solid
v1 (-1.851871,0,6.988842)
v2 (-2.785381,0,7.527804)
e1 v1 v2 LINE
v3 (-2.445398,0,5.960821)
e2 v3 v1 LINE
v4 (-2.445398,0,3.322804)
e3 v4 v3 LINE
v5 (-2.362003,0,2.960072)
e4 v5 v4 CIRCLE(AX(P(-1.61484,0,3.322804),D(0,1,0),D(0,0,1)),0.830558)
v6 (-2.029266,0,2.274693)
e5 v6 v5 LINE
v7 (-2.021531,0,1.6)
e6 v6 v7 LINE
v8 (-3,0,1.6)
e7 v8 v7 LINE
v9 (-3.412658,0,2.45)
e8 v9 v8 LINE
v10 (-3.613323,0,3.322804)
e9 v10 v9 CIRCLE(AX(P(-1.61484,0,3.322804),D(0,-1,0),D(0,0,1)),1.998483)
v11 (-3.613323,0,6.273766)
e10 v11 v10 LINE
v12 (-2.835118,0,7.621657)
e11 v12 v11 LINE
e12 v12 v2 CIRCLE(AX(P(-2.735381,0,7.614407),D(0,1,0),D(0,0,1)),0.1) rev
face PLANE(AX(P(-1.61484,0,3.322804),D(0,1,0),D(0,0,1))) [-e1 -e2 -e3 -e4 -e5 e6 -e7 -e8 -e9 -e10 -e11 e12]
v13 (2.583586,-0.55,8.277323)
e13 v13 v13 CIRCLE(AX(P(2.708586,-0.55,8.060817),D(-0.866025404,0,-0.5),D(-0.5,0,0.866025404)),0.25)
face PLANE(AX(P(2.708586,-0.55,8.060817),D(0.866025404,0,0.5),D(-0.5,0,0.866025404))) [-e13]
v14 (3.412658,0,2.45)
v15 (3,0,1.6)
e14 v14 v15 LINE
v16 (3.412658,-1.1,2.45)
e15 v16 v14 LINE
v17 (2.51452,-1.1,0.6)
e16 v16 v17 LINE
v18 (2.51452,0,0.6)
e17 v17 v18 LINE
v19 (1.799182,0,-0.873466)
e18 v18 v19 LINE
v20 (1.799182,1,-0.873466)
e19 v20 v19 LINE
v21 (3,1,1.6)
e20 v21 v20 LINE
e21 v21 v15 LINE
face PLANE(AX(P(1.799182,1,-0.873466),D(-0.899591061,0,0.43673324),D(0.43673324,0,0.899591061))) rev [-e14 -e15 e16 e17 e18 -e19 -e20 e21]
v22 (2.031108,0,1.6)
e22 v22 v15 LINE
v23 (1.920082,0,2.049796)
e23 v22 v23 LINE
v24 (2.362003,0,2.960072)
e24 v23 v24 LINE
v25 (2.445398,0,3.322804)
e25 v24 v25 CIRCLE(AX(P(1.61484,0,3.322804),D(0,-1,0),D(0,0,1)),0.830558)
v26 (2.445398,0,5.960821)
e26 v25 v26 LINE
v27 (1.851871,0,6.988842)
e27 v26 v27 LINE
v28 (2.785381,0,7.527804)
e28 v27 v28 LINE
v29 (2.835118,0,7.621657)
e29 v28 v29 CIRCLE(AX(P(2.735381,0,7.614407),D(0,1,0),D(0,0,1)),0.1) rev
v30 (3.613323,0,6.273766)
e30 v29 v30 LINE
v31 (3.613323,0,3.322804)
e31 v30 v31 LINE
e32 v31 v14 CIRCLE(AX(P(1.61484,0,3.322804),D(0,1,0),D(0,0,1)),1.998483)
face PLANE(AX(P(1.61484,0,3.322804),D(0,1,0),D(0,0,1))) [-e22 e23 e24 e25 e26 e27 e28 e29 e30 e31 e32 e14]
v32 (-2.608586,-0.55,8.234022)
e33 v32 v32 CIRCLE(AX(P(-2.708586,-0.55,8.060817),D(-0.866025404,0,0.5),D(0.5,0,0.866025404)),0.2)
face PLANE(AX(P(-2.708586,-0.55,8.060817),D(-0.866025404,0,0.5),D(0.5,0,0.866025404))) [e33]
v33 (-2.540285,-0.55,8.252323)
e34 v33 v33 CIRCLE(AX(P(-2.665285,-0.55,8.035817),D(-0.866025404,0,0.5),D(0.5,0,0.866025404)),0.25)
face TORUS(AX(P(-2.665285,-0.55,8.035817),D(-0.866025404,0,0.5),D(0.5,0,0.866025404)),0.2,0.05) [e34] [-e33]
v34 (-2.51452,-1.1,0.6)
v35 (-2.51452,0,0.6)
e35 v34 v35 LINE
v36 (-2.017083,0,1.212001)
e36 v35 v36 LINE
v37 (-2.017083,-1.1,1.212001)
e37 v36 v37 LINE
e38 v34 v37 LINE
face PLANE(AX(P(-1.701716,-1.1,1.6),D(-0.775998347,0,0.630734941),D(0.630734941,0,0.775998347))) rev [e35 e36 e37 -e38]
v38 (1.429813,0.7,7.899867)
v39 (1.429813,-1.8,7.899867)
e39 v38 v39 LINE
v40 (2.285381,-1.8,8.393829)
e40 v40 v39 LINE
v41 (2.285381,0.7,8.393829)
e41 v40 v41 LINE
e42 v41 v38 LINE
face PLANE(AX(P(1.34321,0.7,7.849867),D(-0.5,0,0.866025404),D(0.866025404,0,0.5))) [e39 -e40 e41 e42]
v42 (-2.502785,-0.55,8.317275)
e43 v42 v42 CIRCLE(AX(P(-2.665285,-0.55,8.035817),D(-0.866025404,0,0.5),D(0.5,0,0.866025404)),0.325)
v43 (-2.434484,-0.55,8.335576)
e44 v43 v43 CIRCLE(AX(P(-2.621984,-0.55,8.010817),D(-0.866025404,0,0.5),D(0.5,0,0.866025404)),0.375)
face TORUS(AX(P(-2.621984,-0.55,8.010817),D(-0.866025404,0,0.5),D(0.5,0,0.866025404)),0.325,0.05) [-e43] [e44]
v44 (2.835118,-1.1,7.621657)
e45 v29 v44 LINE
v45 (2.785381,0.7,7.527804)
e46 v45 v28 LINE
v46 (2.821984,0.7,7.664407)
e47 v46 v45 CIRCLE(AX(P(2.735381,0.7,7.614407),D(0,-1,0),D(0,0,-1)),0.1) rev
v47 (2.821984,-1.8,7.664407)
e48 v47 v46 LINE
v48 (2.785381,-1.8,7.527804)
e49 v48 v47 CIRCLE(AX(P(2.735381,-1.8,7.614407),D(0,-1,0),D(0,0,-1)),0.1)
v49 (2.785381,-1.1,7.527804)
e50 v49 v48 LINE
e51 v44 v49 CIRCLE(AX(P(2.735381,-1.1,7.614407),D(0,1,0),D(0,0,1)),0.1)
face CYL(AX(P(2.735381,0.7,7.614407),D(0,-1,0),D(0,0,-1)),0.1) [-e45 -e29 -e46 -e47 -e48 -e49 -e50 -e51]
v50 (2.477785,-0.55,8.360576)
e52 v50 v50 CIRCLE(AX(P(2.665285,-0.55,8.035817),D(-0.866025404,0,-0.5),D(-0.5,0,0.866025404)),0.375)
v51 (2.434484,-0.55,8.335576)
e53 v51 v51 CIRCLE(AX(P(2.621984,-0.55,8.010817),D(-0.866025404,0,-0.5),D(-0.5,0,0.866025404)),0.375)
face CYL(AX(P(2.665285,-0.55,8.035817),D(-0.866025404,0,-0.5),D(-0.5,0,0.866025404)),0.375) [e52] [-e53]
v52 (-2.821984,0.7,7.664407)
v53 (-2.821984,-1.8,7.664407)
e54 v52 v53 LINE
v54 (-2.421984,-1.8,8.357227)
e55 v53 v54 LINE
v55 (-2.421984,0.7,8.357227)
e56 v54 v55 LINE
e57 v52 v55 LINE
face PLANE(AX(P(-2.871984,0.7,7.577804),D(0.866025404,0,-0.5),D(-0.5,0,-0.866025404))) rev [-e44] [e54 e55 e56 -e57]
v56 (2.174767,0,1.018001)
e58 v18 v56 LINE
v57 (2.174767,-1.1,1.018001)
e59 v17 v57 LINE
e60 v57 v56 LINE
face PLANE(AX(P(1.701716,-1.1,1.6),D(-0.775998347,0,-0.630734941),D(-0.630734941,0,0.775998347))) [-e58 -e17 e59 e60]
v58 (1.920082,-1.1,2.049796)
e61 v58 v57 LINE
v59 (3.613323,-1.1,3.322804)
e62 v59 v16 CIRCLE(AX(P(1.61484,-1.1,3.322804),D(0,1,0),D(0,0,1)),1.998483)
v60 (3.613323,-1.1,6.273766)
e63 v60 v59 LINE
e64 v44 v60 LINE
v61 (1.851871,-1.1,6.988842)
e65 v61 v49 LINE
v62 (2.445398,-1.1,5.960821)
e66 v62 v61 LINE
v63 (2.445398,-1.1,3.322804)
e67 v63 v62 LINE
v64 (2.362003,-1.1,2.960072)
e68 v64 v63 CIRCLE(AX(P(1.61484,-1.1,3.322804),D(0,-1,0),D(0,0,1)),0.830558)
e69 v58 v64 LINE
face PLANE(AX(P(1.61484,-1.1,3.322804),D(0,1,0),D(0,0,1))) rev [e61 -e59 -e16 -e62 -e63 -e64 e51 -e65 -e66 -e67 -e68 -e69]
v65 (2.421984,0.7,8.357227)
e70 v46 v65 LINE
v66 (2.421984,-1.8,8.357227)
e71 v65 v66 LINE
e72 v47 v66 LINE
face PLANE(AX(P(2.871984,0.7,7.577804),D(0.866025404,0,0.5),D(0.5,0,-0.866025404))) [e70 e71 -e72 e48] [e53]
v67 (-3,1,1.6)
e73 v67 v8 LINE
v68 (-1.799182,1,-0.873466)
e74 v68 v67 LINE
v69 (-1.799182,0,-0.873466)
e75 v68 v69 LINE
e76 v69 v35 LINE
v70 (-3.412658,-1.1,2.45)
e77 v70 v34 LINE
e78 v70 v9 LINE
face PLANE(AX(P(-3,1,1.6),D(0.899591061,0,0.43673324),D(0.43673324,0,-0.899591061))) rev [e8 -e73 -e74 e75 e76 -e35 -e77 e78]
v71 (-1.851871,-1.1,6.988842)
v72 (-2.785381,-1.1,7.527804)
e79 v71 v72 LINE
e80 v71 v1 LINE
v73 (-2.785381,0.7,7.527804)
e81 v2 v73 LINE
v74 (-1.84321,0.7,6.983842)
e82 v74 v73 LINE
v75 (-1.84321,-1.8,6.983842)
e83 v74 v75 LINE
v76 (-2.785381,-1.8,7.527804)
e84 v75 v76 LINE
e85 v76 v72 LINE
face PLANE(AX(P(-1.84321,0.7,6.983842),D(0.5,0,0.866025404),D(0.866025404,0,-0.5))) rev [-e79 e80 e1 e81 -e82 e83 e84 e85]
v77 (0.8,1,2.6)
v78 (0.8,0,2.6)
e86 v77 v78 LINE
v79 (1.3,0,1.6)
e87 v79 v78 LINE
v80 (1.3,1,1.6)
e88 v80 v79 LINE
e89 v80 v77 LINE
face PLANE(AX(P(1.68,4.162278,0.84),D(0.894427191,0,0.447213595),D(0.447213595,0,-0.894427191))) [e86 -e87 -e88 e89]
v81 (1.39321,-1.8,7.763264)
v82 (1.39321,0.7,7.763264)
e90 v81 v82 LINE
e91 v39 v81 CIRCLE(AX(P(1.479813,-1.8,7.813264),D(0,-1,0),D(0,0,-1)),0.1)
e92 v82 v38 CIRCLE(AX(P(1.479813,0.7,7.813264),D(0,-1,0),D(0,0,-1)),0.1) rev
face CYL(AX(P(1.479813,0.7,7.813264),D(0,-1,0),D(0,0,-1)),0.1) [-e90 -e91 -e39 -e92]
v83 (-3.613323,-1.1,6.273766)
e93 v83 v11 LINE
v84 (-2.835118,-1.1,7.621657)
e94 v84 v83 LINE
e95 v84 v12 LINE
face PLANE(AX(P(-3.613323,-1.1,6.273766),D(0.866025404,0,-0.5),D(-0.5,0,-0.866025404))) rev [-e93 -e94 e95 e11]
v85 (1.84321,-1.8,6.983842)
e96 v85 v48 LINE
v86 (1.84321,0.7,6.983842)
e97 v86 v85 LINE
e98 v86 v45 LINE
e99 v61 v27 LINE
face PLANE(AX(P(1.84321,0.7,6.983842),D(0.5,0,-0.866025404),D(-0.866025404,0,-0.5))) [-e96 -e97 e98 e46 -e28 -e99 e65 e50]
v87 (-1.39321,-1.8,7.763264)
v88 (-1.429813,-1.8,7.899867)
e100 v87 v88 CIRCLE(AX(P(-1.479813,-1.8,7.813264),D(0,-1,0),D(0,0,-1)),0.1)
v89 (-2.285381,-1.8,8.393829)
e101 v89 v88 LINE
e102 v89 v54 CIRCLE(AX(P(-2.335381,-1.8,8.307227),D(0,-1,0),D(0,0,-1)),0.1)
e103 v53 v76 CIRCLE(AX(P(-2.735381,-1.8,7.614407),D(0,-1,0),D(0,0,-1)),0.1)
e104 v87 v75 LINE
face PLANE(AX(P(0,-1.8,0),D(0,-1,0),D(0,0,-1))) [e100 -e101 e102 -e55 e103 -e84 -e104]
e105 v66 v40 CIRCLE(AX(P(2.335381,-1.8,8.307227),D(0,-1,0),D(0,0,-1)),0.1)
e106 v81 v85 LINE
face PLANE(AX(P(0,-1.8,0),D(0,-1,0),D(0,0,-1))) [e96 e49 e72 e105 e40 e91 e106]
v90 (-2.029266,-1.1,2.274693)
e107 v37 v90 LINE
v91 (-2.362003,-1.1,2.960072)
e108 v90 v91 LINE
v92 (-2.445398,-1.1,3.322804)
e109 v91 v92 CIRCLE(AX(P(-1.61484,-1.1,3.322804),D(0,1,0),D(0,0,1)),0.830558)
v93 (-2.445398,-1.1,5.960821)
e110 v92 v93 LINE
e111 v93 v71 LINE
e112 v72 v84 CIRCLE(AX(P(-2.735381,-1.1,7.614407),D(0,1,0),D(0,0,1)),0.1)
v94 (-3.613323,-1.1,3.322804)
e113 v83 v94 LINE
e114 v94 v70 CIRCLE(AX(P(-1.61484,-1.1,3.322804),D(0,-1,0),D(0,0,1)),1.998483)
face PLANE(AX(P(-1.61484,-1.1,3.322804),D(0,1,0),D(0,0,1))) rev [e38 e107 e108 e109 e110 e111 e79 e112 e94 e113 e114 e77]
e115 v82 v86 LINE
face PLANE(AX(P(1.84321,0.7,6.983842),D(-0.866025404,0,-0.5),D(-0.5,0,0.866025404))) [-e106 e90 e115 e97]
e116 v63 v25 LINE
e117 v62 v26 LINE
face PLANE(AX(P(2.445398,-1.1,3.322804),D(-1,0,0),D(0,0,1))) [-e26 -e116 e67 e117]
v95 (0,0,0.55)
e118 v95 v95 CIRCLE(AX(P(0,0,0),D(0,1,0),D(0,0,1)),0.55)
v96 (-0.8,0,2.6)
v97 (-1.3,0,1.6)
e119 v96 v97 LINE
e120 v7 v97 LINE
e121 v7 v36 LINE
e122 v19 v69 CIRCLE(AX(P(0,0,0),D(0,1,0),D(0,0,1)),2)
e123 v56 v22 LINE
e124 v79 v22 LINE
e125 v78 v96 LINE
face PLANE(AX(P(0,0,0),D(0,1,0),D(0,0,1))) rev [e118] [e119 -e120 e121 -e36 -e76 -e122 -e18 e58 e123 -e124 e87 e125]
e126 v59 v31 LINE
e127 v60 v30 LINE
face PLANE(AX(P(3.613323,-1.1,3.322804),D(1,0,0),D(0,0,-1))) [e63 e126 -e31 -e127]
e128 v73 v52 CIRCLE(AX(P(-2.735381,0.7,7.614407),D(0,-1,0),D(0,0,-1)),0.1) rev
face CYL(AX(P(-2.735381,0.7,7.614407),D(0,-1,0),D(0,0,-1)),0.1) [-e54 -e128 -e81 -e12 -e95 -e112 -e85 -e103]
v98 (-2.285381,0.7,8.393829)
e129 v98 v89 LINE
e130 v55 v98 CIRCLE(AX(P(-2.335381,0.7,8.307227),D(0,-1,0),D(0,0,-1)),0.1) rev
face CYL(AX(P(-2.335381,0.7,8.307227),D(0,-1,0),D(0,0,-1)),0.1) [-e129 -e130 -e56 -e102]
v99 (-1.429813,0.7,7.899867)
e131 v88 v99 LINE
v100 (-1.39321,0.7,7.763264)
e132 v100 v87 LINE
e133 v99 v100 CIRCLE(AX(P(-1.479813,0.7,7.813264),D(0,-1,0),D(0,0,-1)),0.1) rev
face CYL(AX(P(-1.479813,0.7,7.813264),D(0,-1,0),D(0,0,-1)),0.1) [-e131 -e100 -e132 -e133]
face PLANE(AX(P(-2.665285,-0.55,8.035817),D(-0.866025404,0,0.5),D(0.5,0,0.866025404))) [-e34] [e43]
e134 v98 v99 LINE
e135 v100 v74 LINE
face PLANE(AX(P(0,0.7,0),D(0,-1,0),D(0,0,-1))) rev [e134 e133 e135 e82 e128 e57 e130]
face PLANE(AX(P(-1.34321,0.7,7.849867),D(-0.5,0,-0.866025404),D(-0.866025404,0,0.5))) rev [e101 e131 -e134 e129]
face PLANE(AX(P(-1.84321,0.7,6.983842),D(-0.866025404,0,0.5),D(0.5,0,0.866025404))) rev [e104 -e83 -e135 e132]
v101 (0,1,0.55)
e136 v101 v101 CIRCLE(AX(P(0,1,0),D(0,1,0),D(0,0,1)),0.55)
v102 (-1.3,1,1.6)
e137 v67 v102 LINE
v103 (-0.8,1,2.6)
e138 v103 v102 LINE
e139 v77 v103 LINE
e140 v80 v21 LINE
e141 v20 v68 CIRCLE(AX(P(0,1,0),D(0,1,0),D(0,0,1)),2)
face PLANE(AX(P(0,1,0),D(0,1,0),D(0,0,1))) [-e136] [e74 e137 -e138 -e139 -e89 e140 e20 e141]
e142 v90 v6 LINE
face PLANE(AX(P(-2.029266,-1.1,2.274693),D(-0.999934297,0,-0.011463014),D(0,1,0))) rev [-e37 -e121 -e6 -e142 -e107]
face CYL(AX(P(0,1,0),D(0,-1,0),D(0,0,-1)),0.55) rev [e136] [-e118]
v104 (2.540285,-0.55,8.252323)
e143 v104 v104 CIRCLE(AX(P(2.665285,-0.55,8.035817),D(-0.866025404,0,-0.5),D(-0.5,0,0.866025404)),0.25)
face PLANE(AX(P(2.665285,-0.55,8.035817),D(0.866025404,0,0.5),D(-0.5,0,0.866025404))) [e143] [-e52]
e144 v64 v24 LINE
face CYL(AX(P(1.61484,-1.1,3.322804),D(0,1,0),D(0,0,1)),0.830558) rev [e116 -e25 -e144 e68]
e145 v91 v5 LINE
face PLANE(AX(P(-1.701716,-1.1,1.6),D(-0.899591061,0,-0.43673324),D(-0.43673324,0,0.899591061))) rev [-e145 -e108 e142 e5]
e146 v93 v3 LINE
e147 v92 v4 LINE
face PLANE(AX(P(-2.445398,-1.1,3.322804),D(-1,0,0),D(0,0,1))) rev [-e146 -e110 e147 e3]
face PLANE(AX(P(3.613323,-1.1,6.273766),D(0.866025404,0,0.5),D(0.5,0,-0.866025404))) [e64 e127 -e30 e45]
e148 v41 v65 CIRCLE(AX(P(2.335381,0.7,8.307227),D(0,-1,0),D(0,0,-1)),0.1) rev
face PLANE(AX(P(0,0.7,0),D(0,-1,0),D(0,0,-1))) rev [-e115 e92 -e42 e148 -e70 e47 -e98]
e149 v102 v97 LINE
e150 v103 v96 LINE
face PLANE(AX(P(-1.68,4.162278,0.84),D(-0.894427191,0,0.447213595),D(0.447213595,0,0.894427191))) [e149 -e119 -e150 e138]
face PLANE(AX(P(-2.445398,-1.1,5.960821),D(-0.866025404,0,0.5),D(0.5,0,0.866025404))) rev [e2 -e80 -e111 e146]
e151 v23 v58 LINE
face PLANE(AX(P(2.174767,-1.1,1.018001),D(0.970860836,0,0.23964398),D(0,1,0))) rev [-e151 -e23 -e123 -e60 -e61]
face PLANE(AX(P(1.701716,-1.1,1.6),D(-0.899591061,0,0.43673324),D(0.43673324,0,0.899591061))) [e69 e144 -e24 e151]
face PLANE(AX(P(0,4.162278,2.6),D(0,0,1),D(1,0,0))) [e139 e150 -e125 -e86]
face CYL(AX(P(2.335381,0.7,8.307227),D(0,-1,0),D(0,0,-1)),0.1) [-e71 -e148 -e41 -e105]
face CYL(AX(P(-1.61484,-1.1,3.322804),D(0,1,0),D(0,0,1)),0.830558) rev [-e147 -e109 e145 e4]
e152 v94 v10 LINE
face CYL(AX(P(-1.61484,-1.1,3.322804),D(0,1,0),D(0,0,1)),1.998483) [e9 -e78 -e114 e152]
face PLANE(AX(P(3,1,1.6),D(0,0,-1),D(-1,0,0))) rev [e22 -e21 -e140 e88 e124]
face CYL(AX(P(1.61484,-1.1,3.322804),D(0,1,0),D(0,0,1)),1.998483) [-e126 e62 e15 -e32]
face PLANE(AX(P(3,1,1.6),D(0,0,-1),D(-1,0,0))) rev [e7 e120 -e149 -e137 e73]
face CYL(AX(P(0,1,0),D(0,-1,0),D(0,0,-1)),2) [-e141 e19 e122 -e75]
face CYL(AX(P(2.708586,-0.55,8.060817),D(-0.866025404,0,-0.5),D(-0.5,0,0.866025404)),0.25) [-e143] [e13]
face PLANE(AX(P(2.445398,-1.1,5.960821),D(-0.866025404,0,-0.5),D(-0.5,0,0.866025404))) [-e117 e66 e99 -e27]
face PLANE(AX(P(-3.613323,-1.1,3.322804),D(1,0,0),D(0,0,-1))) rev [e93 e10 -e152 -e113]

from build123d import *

# Parameters (mm, degrees)
SKETCH1_R           = 0.55
BOSS_EXTRUDE1_DEPTH = 1
BOSS_EXTRUDE3_DEPTH = 1.1
BOSS_EXTRUDE4_DEPTH = 1.25
SKETCH5_R           = 0.375
BOSS_EXTRUDE5_DEPTH = 0.05
SKETCH6_R           = 0.25
BOSS_EXTRUDE6_DEPTH = 0.05
CHAMFER1_SIZE       = 0.75
CHAMFER1_SIZE_2     = 0.5
MIRROR1_START       = -1.1
MIRROR1_DEPTH       = 1.1
MIRROR1_START_2     = -1.8
MIRROR1_2_DEPTH     = 2.5
MIRROR1_START_3     = 6.27611275
MIRROR1_3_OUTLINE_R = 0.375
MIRROR1_3_DEPTH     = 0.05
MIRROR1_START_4     = 6.32611275
MIRROR1_4_OUTLINE_R = 0.25
MIRROR1_4_DEPTH     = 0.05
FILLET2_R           = 0.05
BOSS_EXTRUDE7_DEPTH = 1
FILLET3_R           = 0.1


with BuildPart() as part:
    # Sketch1 → Boss-Extrude1 (new body)
    with BuildSketch(Plane(origin=(0, 0, 0), x_dir=(1, 0, 0), z_dir=(0, 1, 0))):
        with BuildLine():
            Line((-3, -1.6), (-1.799182122, 0.873466479))
            ThreePointArc((-1.799182122, 0.873466479), (0, 2), (1.799182122, 0.873466479))
            Line((1.799182122, 0.873466479), (3, -1.6))
            Line((3, -1.6), (-3, -1.6))
        make_face()
        with Locations(Location((0, 0, 0), (0, 0, 270))):
            Circle(SKETCH1_R, mode=Mode.SUBTRACT)
    extrude(amount=BOSS_EXTRUDE1_DEPTH)

    # Sketch3 → Boss-Extrude3 (add)
    with BuildSketch(Plane(origin=(0, 0, 0), x_dir=(-1, 0, 0), z_dir=(0, -1, 0))):
        with BuildLine():
            Line((2.514520254, -0.6), (3.412657784, -2.45))
            ThreePointArc((3.412657784, -2.45), (3.562510993, -2.875016795), (3.613323348, -3.322803983))
            Line((3.613323348, -3.322803983), (3.613323348, -6.273765877))
            Line((3.613323348, -6.273765877), (2.863323348, -7.572803983))
            Line((2.863323348, -7.572803983), (1.851870719, -6.988841535))
            Line((1.851870719, -6.988841535), (2.445398453, -5.960821345))
            Line((2.445398453, -5.960821345), (2.445398453, -3.322803983))
            ThreePointArc((2.445398453, -3.322803983), (2.424281128, -3.13670618), (2.362002989, -2.960071623))
            Line((2.362002989, -2.960071623), (1.701715763, -1.6))
            Line((1.701715763, -1.6), (2.514520254, -0.6))
        make_face()
    extrude(amount=BOSS_EXTRUDE3_DEPTH)

    # Sketch4 → Boss-Extrude4 (add, symmetric)
    with BuildSketch(Plane(origin=(2.003180044, -0.55, 0.513767997), x_dir=(1, 0, 0), z_dir=(0, 1, 0))):
        Polygon((-3.84639051, -6.470073538), (-4.875163646, -7.064035986), (-4.375163646, -7.930061389), (-3.34639051, -7.336098942), align=None)
    extrude(amount=BOSS_EXTRUDE4_DEPTH, both=True)

    # Sketch5 → Boss-Extrude5 (add)
    with BuildSketch(Plane(origin=(-5.435273078, 0, 3.138056375), x_dir=(0.5000000000000009, 0, 0.8660254037844383), z_dir=(-0.8660254037844382, 0, 0.5000000000000008))):
        with Locations((5.626578953, -0.55)):
            Circle(SKETCH5_R)
    extrude(amount=BOSS_EXTRUDE5_DEPTH)

    # Sketch6 → Boss-Extrude6 (add)
    with BuildSketch(Plane(origin=(-5.478574348, 0, 3.163056375), x_dir=(0.5000000000000008, 0, 0.8660254037844383), z_dir=(-0.8660254037844382, 0, 0.5000000000000007))):
        with Locations((5.626578953, -0.55)):
            Circle(SKETCH6_R)
    extrude(amount=BOSS_EXTRUDE6_DEPTH)

    # Chamfer1
    # the kernel refuses this chamfer: 0.75, 0.5 mm, written as the material it takes off along each edge
    with BuildSketch(Plane(origin=(-1.701715763, 0, 1.6), x_dir=(-0.43673323969900685, 0, 0.899591061172803), z_dir=(0, -1, 0))) as chamfer1_piece_1:
        Polygon((CHAMFER1_SIZE, 0), (-CHAMFER1_SIZE_2 * 0.422618261741, CHAMFER1_SIZE_2 * 0.906307787037), (0, 0), align=None)
    extrude(amount=3.043103543, mode=Mode.SUBTRACT)

    # Mirror1: read off the stored shape, not the designer's step
    # Mirror1 outline → Mirror1 (add)
    with BuildSketch(Plane(origin=(0, 0, 0), x_dir=(1, 0, 0), z_dir=(0, 1, 0)).offset(MIRROR1_START)):
        with BuildLine():
            Line((3.412657784, -2.45), (2.514520254, -0.6))
            Line((2.514520254, -0.6), (2.174766969, -1.01800124))
            Line((2.174766969, -1.01800124), (1.920082383, -2.049795531))
            Line((1.920082383, -2.049795531), (2.362002989, -2.960071623))
            ThreePointArc((2.362002989, -2.960071623), (2.424281128, -3.13670618), (2.445398453, -3.322803983))
            Line((2.445398453, -3.322803983), (2.445398453, -5.960821345))
            Line((2.445398453, -5.960821345), (1.851870719, -6.988841535))
            Line((1.851870719, -6.988841535), (1.843210465, -6.983841535))
            Line((1.843210465, -6.983841535), (1.343210465, -7.849866939))
            Line((1.343210465, -7.849866939), (2.371983602, -8.443829386))
            Line((2.371983602, -8.443829386), (2.871983602, -7.577803983))
            Line((2.871983602, -7.577803983), (2.863323348, -7.572803983))
            Line((2.863323348, -7.572803983), (3.613323348, -6.273765877))
            Line((3.613323348, -6.273765877), (3.613323348, -3.322803983))
            ThreePointArc((3.613323348, -3.322803983), (3.562510993, -2.875016795), (3.412657784, -2.45))
        make_face()
    extrude(amount=MIRROR1_DEPTH)

    # Mirror1 2 outline → Mirror1 2 (add)
    with BuildSketch(Plane(origin=(0, 0, 0), x_dir=(1, 0, 0), z_dir=(0, 1, 0)).offset(MIRROR1_START_2)):
        Polygon((2.871983602, -7.577803983), (1.843210465, -6.983841535), (1.343210465, -7.849866939), (2.371983602, -8.443829386), align=None)
    extrude(amount=MIRROR1_2_DEPTH)

    # Mirror1 3 outline → Mirror1 3 (add)
    with BuildSketch(Plane(origin=(0, 0, 0), x_dir=(0.500000000000001, 0, -0.866025403784438), z_dir=(0.866025403784438, 0, 0.500000000000001)).offset(MIRROR1_START_3)):
        with Locations((-5.626578953, -0.55)):
            Circle(MIRROR1_3_OUTLINE_R)
    extrude(amount=MIRROR1_3_DEPTH)

    # Mirror1 4 outline → Mirror1 4 (add)
    with BuildSketch(Plane(origin=(0, 0, 0), x_dir=(0.500000000000001, 0, -0.866025403784438), z_dir=(0.866025403784438, 0, 0.500000000000001)).offset(MIRROR1_START_4)):
        with Locations((-5.626578953, -0.55)):
            Circle(MIRROR1_4_OUTLINE_R)
    extrude(amount=MIRROR1_4_DEPTH)

    # Fillet2
    fillet2_edges = [part.edges().sort_by_distance(p)[0] for p in [
        (-2.852784872, -0.55, 7.711057158),
        (-2.833586142, -0.55, 7.844310334),
    ]]
    fillet(fillet2_edges, radius=FILLET2_R - 0.0001)  # a hair under: the kernel refuses the full size

    # Sketch7 → Boss-Extrude7 (add)
    with BuildSketch(Plane(origin=(0, 0, 0), x_dir=(1, 0, 0), z_dir=(0, 1, 0))):
        Polygon((-0.8, -2.6), (0.8, -2.6), (1.3, -1.6), (0, -0.8), (-1.3, -1.6), align=None)
    extrude(amount=BOSS_EXTRUDE7_DEPTH)

    # Fillet3
    # the kernel refuses this fillet: 0.1 mm, written as the material it takes off along each edge
    with BuildSketch(Plane(origin=(2.871983602, -1.1, 7.577803983), x_dir=(-0.8660254028383251, 0, -0.5000000016387168), z_dir=(0, 1, 0))) as fillet3_piece_1_section:
        with BuildLine():
            CenterArc((FILLET3_R * 0.9999999985, FILLET3_R), FILLET3_R, 180.000000086, 89.999999914)
            Line((-FILLET3_R * 1.50001067123e-09, FILLET3_R * 0.9999999985), (0, 0))
            Line((0, 0), (FILLET3_R * 0.9999999985, 0))
        make_face()
    fillet3_piece_1 = extrude(amount=1.1, mode=Mode.PRIVATE)
    fillet3_piece_1 = split(fillet3_piece_1, bisect_by=Plane(origin=(2.863323348, -1.1, 7.572803983), z_dir=(0.8660254038383292, 0, 0.49999999990665916)), keep=Keep.TOP, mode=Mode.PRIVATE)
    add(fillet3_piece_1, mode=Mode.SUBTRACT)
    with BuildSketch(Plane(origin=(2.371983602, 0.95, 8.443829386), x_dir=(0.5000000003396727, 0, -0.8660254035883286), z_dir=(0, -1, 0)), Plane(origin=(1.343210465, -2.05, 7.849866939), x_dir=(0.4999999999066601, 0, -0.8660254038383285), z_dir=(0, 1, 0)), Plane(origin=(-2.371983602, -2.05, 8.443829386), x_dir=(-0.5000000000000007, 0, -0.8660254037844383), z_dir=(0, 1, 0))) as fillet3_piece_2:
        with BuildLine():
            CenterArc((FILLET3_R, -FILLET3_R), FILLET3_R, 90, 89.999999953)
            Line((0, -FILLET3_R), (0, 0))
            Line((0, 0), (FILLET3_R, 0))
        make_face()
    extrude(amount=3, mode=Mode.SUBTRACT)
    with BuildSketch(Plane(origin=(-2.871983602, -2.05, 7.577803983), x_dir=(0.5000000000000002, 0, 0.8660254037844386), z_dir=(0, 1, 0))) as fillet3_piece_3_section:
        with BuildLine():
            CenterArc((FILLET3_R, FILLET3_R), FILLET3_R, 180, 90)
            Line((0, FILLET3_R), (0, 0))
            Line((0, 0), (FILLET3_R, 0))
        make_face()
    fillet3_piece_3 = extrude(amount=3, mode=Mode.PRIVATE)
    fillet3_piece_3 = split(fillet3_piece_3, bisect_by=Plane(origin=(-2.871983602, -1.1, 7.577803983), z_dir=(0, -1, 0)), keep=Keep.TOP, mode=Mode.PRIVATE)
    fillet3_piece_3 = split(fillet3_piece_3, bisect_by=Plane(origin=(-2.863323348, -2.05, 7.572803983), z_dir=(-0.8660254037844362, 0, 0.5000000000000044)), keep=Keep.TOP, mode=Mode.PRIVATE)
    add(fillet3_piece_3, mode=Mode.SUBTRACT)
    with BuildSketch(Plane(origin=(-2.871983602, -2.05, 7.577803983), x_dir=(0.5000000000000002, 0, 0.8660254037844386), z_dir=(0, 1, 0))) as fillet3_piece_4_section:
        with BuildLine():
            CenterArc((FILLET3_R, FILLET3_R), FILLET3_R, 180, 90)
            Line((0, FILLET3_R), (0, 0))
            Line((0, 0), (FILLET3_R, 0))
        make_face()
    fillet3_piece_4 = extrude(amount=3, mode=Mode.PRIVATE)
    fillet3_piece_4 = split(fillet3_piece_4, bisect_by=Plane(origin=(-2.871983602, -1.1, 7.577803983), z_dir=(0, -1, 0)), keep=Keep.TOP, mode=Mode.PRIVATE)
    fillet3_piece_4 = split(fillet3_piece_4, bisect_by=Plane(origin=(-2.863323348, -2.05, 7.572803983), z_dir=(0.8660254037844362, 0, -0.5000000000000044)), keep=Keep.TOP, mode=Mode.PRIVATE)
    add(fillet3_piece_4, mode=Mode.SUBTRACT)
    with BuildSketch(Plane(origin=(-2.871983602, -2.05, 7.577803983), x_dir=(0.5000000000000002, 0, 0.8660254037844386), z_dir=(0, 1, 0))) as fillet3_piece_5_section:
        with BuildLine():
            CenterArc((FILLET3_R, FILLET3_R), FILLET3_R, 180, 90)
            Line((0, FILLET3_R), (0, 0))
            Line((0, 0), (FILLET3_R, 0))
        make_face()
    fillet3_piece_5 = extrude(amount=3, mode=Mode.PRIVATE)
    fillet3_piece_5 = split(fillet3_piece_5, bisect_by=Plane(origin=(-2.871983602, 0, 7.577803983), z_dir=(0, -1, 0)), keep=Keep.TOP, mode=Mode.PRIVATE)
    fillet3_piece_5 = split(fillet3_piece_5, bisect_by=Plane(origin=(-2.871983602, -1.1, 7.577803983), z_dir=(0, 1, 0)), keep=Keep.TOP, mode=Mode.PRIVATE)
    fillet3_piece_5 = split(fillet3_piece_5, bisect_by=Plane(origin=(-2.863323348, -2.05, 7.572803983), z_dir=(-0.8660254037844362, 0, 0.5000000000000044)), keep=Keep.TOP, mode=Mode.PRIVATE)
    add(fillet3_piece_5, mode=Mode.SUBTRACT)
    with BuildSketch(Plane(origin=(-2.871983602, -2.05, 7.577803983), x_dir=(0.5000000000000002, 0, 0.8660254037844386), z_dir=(0, 1, 0))) as fillet3_piece_6_section:
        with BuildLine():
            CenterArc((FILLET3_R, FILLET3_R), FILLET3_R, 180, 90)
            Line((0, FILLET3_R), (0, 0))
            Line((0, 0), (FILLET3_R, 0))
        make_face()
    fillet3_piece_6 = extrude(amount=3, mode=Mode.PRIVATE)
    fillet3_piece_6 = split(fillet3_piece_6, bisect_by=Plane(origin=(-2.871983602, 0, 7.577803983), z_dir=(0, 1, 0)), keep=Keep.TOP, mode=Mode.PRIVATE)
    fillet3_piece_6 = split(fillet3_piece_6, bisect_by=Plane(origin=(-2.863323348, -2.05, 7.572803983), z_dir=(-0.8660254037844362, 0, 0.5000000000000044)), keep=Keep.TOP, mode=Mode.PRIVATE)
    add(fillet3_piece_6, mode=Mode.SUBTRACT)
    with BuildSketch(Plane(origin=(-2.871983602, -2.05, 7.577803983), x_dir=(0.5000000000000002, 0, 0.8660254037844386), z_dir=(0, 1, 0))) as fillet3_piece_7_section:
        with BuildLine():
            CenterArc((FILLET3_R, FILLET3_R), FILLET3_R, 180, 90)
            Line((0, FILLET3_R), (0, 0))
            Line((0, 0), (FILLET3_R, 0))
        make_face()
    fillet3_piece_7 = extrude(amount=3, mode=Mode.PRIVATE)
    fillet3_piece_7 = split(fillet3_piece_7, bisect_by=Plane(origin=(-2.871983602, 0, 7.577803983), z_dir=(0, 1, 0)), keep=Keep.TOP, mode=Mode.PRIVATE)
    fillet3_piece_7 = split(fillet3_piece_7, bisect_by=Plane(origin=(-2.863323348, -2.05, 7.572803983), z_dir=(0.8660254037844362, 0, -0.5000000000000044)), keep=Keep.TOP, mode=Mode.PRIVATE)
    add(fillet3_piece_7, mode=Mode.SUBTRACT)
    with BuildSketch(Plane(origin=(-1.343210465, 0.95, 7.849866939), x_dir=(-0.8660254037844438, 0, 0.4999999999999912), z_dir=(0, -1, 0))) as fillet3_piece_8:
        with BuildLine():
            CenterArc((FILLET3_R, FILLET3_R), FILLET3_R, 180, 90)
            Line((0, FILLET3_R), (0, 0))
            Line((0, 0), (FILLET3_R, 0))
        make_face()
    extrude(amount=3, mode=Mode.SUBTRACT)
    with BuildSketch(Plane(origin=(2.871983602, -2.05, 7.577803983), x_dir=(-0.866025403632075, 0, -0.5000000002639015), z_dir=(0, 1, 0)), Plane(origin=(2.871983602, 0, 7.577803983), x_dir=(-0.866025403632075, 0, -0.5000000002639015), z_dir=(0, 1, 0))) as fillet3_piece_9:
        with BuildLine():
            CenterArc((FILLET3_R, FILLET3_R), FILLET3_R, 179.999999995, 90.000000005)
            Line((0, FILLET3_R), (0, 0))
            Line((0, 0), (FILLET3_R, 0))
        make_face()
    extrude(amount=0.95, mode=Mode.SUBTRACT)


solid = part.part
